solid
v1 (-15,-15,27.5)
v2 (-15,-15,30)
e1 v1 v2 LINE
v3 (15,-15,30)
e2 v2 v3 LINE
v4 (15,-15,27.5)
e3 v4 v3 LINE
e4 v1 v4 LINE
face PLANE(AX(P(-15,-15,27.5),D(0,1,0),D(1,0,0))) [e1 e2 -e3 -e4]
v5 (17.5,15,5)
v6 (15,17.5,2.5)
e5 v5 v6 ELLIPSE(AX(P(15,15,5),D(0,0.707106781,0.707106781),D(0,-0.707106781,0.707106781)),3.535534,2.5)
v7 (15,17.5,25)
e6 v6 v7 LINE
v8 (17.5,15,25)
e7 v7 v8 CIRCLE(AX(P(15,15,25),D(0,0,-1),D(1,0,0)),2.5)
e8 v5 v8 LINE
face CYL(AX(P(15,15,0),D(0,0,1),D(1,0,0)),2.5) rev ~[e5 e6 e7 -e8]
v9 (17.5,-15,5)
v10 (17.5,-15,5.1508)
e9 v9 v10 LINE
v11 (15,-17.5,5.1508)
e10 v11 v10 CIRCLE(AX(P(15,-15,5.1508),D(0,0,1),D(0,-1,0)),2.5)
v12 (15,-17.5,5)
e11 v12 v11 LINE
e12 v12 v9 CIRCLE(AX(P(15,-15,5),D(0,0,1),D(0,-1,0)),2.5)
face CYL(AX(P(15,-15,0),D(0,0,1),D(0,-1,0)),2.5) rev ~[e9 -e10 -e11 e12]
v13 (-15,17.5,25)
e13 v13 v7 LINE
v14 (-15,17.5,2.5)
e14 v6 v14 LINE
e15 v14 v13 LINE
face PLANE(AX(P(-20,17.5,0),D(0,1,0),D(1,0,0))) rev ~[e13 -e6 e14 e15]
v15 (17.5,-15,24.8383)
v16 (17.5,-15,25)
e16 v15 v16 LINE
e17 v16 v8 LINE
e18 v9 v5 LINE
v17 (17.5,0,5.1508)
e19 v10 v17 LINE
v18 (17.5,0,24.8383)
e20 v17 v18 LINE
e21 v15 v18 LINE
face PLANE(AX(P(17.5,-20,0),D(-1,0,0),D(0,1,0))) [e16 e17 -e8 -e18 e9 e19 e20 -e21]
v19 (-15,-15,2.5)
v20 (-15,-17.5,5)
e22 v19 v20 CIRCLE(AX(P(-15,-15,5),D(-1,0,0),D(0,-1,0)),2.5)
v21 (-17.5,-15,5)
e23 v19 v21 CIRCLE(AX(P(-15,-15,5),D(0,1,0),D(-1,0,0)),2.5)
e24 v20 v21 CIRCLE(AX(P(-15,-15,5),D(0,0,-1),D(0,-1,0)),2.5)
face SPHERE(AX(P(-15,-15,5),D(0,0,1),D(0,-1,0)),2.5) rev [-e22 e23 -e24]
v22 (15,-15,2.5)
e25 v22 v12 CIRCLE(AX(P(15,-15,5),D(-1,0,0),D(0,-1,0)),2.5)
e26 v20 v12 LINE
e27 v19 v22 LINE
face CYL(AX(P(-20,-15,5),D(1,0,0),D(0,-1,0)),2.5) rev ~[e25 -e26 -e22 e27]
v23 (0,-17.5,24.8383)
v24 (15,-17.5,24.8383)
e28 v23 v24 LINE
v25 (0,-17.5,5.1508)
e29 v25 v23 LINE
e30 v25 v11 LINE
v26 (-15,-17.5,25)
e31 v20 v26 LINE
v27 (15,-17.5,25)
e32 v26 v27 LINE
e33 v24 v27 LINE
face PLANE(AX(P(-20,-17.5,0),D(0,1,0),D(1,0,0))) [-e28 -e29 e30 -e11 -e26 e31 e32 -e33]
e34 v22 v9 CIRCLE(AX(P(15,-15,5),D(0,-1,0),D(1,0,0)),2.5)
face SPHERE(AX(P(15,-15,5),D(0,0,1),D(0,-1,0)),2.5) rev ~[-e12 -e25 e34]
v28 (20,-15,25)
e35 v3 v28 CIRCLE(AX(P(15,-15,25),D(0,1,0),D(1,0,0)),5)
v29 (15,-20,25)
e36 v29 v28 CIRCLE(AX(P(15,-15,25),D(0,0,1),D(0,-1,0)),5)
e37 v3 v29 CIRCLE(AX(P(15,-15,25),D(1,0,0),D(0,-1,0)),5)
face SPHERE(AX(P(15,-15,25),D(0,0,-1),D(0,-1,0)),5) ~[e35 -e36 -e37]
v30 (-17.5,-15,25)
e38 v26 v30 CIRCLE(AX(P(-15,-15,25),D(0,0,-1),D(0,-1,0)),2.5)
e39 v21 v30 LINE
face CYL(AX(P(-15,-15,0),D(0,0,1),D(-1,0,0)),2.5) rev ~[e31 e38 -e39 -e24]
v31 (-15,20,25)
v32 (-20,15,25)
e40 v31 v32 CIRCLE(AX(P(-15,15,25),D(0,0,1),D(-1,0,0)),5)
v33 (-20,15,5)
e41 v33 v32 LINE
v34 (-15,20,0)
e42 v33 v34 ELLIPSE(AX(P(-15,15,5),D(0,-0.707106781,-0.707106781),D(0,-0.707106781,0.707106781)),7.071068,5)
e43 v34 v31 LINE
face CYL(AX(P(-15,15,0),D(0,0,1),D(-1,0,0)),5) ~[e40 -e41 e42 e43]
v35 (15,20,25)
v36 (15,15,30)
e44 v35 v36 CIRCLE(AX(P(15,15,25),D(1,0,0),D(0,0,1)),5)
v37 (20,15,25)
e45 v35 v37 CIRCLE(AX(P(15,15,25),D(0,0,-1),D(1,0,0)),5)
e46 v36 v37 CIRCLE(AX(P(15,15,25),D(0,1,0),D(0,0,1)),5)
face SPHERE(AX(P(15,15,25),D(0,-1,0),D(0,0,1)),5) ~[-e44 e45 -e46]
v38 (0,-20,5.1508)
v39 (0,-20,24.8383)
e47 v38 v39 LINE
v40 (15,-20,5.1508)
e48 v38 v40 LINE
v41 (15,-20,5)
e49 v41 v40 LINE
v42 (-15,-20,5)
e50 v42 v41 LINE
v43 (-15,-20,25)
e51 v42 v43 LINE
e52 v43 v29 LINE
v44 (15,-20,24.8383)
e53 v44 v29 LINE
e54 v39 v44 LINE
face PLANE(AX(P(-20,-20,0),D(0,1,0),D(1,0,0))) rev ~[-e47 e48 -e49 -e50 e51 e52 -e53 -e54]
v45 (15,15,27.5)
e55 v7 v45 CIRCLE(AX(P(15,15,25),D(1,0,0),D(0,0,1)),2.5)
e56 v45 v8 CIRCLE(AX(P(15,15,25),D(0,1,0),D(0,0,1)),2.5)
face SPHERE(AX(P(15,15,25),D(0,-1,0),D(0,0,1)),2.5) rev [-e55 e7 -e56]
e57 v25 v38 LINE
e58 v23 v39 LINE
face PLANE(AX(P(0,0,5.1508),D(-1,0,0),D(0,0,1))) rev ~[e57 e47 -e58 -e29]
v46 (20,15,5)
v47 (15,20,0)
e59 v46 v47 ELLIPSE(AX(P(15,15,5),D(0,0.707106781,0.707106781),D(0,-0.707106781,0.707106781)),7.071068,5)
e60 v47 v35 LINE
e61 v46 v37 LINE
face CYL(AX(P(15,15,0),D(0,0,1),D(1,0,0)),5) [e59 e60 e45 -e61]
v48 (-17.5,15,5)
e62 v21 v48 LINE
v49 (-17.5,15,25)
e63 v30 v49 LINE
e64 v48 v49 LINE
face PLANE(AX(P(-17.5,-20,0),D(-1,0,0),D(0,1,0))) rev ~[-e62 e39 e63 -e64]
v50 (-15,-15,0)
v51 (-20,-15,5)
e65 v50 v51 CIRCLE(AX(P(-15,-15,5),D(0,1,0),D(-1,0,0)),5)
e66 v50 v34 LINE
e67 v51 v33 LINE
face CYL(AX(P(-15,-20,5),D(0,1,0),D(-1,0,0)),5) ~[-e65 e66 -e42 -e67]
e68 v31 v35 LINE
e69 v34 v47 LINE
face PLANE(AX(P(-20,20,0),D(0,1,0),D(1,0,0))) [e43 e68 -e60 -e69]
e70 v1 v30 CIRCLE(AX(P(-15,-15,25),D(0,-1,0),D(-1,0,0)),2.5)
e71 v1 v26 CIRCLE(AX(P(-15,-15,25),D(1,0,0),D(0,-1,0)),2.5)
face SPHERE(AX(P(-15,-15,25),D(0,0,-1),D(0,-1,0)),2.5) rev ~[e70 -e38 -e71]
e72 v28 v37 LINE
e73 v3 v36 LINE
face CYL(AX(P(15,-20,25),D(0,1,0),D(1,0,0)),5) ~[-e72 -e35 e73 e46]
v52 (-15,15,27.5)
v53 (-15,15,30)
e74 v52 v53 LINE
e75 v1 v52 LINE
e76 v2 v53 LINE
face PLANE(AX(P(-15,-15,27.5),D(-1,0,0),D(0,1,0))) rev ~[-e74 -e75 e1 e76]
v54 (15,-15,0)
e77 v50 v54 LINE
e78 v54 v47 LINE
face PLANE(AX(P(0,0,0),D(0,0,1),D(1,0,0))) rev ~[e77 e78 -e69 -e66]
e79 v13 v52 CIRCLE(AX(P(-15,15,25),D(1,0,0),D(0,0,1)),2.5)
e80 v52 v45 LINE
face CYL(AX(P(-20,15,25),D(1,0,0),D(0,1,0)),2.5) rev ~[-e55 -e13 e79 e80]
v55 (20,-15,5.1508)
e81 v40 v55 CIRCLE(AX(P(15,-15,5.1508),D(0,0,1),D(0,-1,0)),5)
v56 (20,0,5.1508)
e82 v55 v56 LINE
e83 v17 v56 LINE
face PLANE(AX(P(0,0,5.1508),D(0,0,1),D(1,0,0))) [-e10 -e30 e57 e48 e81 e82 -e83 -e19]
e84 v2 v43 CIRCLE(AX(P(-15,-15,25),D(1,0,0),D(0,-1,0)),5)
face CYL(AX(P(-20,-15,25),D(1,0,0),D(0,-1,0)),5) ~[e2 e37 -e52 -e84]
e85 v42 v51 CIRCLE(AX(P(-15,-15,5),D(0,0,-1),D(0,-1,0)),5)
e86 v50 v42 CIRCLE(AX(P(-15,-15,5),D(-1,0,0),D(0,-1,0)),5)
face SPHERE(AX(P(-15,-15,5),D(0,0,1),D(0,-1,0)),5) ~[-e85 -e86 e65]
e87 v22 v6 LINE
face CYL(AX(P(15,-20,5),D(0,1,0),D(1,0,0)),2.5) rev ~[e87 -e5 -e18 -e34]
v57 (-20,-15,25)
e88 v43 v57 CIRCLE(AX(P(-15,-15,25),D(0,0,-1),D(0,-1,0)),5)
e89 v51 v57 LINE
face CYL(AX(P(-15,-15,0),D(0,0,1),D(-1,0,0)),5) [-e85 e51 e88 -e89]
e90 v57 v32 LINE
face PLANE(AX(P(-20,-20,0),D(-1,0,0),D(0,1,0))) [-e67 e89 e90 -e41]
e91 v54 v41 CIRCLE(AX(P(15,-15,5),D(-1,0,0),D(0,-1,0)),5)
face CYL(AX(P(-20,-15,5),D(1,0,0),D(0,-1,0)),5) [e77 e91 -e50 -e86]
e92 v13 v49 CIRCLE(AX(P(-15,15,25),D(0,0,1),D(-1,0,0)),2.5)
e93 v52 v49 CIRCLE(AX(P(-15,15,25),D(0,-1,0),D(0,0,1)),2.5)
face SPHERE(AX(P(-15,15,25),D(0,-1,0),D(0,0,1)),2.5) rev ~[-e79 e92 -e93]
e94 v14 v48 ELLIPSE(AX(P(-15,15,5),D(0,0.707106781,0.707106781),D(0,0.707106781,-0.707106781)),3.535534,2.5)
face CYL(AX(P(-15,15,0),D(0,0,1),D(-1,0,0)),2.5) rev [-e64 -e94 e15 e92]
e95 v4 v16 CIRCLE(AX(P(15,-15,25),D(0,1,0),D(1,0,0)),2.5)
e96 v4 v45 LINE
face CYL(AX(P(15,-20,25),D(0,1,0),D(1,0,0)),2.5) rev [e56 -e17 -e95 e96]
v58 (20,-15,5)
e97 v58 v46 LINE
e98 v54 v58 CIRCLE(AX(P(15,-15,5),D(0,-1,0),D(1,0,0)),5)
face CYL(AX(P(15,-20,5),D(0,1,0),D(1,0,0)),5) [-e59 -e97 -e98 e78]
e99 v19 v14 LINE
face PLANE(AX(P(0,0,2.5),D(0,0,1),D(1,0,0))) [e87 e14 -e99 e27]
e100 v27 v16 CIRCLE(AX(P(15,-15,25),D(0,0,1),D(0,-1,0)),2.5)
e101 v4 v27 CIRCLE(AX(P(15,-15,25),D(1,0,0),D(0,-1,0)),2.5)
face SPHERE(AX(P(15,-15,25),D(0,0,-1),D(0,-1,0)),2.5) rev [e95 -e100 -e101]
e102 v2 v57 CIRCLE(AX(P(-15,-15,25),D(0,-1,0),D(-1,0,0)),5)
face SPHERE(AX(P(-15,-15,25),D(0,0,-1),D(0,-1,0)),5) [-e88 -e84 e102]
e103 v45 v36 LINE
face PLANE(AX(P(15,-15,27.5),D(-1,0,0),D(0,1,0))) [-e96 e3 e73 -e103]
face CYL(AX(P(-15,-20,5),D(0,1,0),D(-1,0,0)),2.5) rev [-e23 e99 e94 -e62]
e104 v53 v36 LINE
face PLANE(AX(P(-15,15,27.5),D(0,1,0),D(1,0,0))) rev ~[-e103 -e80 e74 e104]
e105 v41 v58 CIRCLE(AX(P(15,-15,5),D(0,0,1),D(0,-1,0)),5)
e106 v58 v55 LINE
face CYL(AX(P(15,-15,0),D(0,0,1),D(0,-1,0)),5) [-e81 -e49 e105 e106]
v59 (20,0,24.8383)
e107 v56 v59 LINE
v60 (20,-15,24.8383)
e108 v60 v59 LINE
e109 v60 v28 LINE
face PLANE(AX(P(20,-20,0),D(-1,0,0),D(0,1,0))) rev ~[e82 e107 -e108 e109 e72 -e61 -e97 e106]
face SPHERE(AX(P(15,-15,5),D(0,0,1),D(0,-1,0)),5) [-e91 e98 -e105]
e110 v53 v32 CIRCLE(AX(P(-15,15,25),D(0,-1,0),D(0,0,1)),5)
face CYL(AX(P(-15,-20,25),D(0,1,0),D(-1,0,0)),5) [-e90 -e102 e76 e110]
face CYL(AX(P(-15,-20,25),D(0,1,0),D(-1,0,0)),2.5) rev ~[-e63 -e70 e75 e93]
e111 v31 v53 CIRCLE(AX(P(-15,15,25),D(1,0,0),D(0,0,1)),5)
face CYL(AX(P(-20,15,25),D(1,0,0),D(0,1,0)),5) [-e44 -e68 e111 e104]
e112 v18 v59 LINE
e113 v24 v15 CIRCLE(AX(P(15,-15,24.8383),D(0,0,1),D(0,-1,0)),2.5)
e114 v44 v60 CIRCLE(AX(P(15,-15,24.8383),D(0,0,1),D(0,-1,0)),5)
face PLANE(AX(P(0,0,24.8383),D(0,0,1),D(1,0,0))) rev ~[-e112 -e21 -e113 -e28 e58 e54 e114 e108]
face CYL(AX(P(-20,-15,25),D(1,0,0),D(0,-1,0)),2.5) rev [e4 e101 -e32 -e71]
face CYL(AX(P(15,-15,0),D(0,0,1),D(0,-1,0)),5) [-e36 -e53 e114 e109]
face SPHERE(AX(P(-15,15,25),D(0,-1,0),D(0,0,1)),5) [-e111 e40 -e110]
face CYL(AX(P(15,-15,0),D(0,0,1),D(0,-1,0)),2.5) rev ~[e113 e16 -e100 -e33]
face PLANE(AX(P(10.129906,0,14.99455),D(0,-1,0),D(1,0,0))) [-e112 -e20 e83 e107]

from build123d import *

# Parameters (mm, degrees)
F0_W     = 40
F0_H     = 40
F1_DEPTH = 30
F2_R     = 5
F3_T     = -2.5
F4_W     = 20.2598124743
F4_H     = 19.6875007823
F5_DEPTH = 61


# Not quite as in the source:
# - a shell that OpenCascade refuses in one call is made with other operations: the cavity is built on its own and cut out


with BuildPart() as f1:
    # F0 (on Top) → F1 (new body)
    with BuildSketch(Plane.XY):
        Rectangle(F0_W, F0_H)
    extrude(amount=F1_DEPTH)

    # F2
    f2_edges = [f1.edges().sort_by_distance(p)[0] for p in [
        (-20, -20, 15),
        (20, -20, 15),
        (0, -20, 0),
        (0, -20, 30),
        (-20, 0, 30),
        (20, 0, 30),
        (0, 20, 30),
        (20, 20, 15),
        (20, 0, 0),
        (-20, 20, 15),
        (-20, 0, 0),
    ]]
    fillet(f2_edges, radius=F2_R)

    # F3: a shell. OpenCascade refuses it in one call, so the cavity is built on its own and cut out:
    # the body offset inwards by the wall thickness, plus a prism from it out through each open face.
    f3_core = offset(f1.part, amount=F3_T, mode=Mode.PRIVATE)
    f3_exits = [f3_core.faces().sort_by_distance(p)[0] for p in [
        (0, 0, 27.5),
    ]]
    add(f3_core, mode=Mode.SUBTRACT)
    extrude(f3_exits, amount=-F3_T, mode=Mode.SUBTRACT)

    # F4 (on Front) → F5 (cut)
    with BuildSketch(Plane.XZ):
        with Locations((10.1299062371, 14.9945500307)):
            Rectangle(F4_W, F4_H)
    extrude(amount=F5_DEPTH, mode=Mode.SUBTRACT)


solid = f1.part
